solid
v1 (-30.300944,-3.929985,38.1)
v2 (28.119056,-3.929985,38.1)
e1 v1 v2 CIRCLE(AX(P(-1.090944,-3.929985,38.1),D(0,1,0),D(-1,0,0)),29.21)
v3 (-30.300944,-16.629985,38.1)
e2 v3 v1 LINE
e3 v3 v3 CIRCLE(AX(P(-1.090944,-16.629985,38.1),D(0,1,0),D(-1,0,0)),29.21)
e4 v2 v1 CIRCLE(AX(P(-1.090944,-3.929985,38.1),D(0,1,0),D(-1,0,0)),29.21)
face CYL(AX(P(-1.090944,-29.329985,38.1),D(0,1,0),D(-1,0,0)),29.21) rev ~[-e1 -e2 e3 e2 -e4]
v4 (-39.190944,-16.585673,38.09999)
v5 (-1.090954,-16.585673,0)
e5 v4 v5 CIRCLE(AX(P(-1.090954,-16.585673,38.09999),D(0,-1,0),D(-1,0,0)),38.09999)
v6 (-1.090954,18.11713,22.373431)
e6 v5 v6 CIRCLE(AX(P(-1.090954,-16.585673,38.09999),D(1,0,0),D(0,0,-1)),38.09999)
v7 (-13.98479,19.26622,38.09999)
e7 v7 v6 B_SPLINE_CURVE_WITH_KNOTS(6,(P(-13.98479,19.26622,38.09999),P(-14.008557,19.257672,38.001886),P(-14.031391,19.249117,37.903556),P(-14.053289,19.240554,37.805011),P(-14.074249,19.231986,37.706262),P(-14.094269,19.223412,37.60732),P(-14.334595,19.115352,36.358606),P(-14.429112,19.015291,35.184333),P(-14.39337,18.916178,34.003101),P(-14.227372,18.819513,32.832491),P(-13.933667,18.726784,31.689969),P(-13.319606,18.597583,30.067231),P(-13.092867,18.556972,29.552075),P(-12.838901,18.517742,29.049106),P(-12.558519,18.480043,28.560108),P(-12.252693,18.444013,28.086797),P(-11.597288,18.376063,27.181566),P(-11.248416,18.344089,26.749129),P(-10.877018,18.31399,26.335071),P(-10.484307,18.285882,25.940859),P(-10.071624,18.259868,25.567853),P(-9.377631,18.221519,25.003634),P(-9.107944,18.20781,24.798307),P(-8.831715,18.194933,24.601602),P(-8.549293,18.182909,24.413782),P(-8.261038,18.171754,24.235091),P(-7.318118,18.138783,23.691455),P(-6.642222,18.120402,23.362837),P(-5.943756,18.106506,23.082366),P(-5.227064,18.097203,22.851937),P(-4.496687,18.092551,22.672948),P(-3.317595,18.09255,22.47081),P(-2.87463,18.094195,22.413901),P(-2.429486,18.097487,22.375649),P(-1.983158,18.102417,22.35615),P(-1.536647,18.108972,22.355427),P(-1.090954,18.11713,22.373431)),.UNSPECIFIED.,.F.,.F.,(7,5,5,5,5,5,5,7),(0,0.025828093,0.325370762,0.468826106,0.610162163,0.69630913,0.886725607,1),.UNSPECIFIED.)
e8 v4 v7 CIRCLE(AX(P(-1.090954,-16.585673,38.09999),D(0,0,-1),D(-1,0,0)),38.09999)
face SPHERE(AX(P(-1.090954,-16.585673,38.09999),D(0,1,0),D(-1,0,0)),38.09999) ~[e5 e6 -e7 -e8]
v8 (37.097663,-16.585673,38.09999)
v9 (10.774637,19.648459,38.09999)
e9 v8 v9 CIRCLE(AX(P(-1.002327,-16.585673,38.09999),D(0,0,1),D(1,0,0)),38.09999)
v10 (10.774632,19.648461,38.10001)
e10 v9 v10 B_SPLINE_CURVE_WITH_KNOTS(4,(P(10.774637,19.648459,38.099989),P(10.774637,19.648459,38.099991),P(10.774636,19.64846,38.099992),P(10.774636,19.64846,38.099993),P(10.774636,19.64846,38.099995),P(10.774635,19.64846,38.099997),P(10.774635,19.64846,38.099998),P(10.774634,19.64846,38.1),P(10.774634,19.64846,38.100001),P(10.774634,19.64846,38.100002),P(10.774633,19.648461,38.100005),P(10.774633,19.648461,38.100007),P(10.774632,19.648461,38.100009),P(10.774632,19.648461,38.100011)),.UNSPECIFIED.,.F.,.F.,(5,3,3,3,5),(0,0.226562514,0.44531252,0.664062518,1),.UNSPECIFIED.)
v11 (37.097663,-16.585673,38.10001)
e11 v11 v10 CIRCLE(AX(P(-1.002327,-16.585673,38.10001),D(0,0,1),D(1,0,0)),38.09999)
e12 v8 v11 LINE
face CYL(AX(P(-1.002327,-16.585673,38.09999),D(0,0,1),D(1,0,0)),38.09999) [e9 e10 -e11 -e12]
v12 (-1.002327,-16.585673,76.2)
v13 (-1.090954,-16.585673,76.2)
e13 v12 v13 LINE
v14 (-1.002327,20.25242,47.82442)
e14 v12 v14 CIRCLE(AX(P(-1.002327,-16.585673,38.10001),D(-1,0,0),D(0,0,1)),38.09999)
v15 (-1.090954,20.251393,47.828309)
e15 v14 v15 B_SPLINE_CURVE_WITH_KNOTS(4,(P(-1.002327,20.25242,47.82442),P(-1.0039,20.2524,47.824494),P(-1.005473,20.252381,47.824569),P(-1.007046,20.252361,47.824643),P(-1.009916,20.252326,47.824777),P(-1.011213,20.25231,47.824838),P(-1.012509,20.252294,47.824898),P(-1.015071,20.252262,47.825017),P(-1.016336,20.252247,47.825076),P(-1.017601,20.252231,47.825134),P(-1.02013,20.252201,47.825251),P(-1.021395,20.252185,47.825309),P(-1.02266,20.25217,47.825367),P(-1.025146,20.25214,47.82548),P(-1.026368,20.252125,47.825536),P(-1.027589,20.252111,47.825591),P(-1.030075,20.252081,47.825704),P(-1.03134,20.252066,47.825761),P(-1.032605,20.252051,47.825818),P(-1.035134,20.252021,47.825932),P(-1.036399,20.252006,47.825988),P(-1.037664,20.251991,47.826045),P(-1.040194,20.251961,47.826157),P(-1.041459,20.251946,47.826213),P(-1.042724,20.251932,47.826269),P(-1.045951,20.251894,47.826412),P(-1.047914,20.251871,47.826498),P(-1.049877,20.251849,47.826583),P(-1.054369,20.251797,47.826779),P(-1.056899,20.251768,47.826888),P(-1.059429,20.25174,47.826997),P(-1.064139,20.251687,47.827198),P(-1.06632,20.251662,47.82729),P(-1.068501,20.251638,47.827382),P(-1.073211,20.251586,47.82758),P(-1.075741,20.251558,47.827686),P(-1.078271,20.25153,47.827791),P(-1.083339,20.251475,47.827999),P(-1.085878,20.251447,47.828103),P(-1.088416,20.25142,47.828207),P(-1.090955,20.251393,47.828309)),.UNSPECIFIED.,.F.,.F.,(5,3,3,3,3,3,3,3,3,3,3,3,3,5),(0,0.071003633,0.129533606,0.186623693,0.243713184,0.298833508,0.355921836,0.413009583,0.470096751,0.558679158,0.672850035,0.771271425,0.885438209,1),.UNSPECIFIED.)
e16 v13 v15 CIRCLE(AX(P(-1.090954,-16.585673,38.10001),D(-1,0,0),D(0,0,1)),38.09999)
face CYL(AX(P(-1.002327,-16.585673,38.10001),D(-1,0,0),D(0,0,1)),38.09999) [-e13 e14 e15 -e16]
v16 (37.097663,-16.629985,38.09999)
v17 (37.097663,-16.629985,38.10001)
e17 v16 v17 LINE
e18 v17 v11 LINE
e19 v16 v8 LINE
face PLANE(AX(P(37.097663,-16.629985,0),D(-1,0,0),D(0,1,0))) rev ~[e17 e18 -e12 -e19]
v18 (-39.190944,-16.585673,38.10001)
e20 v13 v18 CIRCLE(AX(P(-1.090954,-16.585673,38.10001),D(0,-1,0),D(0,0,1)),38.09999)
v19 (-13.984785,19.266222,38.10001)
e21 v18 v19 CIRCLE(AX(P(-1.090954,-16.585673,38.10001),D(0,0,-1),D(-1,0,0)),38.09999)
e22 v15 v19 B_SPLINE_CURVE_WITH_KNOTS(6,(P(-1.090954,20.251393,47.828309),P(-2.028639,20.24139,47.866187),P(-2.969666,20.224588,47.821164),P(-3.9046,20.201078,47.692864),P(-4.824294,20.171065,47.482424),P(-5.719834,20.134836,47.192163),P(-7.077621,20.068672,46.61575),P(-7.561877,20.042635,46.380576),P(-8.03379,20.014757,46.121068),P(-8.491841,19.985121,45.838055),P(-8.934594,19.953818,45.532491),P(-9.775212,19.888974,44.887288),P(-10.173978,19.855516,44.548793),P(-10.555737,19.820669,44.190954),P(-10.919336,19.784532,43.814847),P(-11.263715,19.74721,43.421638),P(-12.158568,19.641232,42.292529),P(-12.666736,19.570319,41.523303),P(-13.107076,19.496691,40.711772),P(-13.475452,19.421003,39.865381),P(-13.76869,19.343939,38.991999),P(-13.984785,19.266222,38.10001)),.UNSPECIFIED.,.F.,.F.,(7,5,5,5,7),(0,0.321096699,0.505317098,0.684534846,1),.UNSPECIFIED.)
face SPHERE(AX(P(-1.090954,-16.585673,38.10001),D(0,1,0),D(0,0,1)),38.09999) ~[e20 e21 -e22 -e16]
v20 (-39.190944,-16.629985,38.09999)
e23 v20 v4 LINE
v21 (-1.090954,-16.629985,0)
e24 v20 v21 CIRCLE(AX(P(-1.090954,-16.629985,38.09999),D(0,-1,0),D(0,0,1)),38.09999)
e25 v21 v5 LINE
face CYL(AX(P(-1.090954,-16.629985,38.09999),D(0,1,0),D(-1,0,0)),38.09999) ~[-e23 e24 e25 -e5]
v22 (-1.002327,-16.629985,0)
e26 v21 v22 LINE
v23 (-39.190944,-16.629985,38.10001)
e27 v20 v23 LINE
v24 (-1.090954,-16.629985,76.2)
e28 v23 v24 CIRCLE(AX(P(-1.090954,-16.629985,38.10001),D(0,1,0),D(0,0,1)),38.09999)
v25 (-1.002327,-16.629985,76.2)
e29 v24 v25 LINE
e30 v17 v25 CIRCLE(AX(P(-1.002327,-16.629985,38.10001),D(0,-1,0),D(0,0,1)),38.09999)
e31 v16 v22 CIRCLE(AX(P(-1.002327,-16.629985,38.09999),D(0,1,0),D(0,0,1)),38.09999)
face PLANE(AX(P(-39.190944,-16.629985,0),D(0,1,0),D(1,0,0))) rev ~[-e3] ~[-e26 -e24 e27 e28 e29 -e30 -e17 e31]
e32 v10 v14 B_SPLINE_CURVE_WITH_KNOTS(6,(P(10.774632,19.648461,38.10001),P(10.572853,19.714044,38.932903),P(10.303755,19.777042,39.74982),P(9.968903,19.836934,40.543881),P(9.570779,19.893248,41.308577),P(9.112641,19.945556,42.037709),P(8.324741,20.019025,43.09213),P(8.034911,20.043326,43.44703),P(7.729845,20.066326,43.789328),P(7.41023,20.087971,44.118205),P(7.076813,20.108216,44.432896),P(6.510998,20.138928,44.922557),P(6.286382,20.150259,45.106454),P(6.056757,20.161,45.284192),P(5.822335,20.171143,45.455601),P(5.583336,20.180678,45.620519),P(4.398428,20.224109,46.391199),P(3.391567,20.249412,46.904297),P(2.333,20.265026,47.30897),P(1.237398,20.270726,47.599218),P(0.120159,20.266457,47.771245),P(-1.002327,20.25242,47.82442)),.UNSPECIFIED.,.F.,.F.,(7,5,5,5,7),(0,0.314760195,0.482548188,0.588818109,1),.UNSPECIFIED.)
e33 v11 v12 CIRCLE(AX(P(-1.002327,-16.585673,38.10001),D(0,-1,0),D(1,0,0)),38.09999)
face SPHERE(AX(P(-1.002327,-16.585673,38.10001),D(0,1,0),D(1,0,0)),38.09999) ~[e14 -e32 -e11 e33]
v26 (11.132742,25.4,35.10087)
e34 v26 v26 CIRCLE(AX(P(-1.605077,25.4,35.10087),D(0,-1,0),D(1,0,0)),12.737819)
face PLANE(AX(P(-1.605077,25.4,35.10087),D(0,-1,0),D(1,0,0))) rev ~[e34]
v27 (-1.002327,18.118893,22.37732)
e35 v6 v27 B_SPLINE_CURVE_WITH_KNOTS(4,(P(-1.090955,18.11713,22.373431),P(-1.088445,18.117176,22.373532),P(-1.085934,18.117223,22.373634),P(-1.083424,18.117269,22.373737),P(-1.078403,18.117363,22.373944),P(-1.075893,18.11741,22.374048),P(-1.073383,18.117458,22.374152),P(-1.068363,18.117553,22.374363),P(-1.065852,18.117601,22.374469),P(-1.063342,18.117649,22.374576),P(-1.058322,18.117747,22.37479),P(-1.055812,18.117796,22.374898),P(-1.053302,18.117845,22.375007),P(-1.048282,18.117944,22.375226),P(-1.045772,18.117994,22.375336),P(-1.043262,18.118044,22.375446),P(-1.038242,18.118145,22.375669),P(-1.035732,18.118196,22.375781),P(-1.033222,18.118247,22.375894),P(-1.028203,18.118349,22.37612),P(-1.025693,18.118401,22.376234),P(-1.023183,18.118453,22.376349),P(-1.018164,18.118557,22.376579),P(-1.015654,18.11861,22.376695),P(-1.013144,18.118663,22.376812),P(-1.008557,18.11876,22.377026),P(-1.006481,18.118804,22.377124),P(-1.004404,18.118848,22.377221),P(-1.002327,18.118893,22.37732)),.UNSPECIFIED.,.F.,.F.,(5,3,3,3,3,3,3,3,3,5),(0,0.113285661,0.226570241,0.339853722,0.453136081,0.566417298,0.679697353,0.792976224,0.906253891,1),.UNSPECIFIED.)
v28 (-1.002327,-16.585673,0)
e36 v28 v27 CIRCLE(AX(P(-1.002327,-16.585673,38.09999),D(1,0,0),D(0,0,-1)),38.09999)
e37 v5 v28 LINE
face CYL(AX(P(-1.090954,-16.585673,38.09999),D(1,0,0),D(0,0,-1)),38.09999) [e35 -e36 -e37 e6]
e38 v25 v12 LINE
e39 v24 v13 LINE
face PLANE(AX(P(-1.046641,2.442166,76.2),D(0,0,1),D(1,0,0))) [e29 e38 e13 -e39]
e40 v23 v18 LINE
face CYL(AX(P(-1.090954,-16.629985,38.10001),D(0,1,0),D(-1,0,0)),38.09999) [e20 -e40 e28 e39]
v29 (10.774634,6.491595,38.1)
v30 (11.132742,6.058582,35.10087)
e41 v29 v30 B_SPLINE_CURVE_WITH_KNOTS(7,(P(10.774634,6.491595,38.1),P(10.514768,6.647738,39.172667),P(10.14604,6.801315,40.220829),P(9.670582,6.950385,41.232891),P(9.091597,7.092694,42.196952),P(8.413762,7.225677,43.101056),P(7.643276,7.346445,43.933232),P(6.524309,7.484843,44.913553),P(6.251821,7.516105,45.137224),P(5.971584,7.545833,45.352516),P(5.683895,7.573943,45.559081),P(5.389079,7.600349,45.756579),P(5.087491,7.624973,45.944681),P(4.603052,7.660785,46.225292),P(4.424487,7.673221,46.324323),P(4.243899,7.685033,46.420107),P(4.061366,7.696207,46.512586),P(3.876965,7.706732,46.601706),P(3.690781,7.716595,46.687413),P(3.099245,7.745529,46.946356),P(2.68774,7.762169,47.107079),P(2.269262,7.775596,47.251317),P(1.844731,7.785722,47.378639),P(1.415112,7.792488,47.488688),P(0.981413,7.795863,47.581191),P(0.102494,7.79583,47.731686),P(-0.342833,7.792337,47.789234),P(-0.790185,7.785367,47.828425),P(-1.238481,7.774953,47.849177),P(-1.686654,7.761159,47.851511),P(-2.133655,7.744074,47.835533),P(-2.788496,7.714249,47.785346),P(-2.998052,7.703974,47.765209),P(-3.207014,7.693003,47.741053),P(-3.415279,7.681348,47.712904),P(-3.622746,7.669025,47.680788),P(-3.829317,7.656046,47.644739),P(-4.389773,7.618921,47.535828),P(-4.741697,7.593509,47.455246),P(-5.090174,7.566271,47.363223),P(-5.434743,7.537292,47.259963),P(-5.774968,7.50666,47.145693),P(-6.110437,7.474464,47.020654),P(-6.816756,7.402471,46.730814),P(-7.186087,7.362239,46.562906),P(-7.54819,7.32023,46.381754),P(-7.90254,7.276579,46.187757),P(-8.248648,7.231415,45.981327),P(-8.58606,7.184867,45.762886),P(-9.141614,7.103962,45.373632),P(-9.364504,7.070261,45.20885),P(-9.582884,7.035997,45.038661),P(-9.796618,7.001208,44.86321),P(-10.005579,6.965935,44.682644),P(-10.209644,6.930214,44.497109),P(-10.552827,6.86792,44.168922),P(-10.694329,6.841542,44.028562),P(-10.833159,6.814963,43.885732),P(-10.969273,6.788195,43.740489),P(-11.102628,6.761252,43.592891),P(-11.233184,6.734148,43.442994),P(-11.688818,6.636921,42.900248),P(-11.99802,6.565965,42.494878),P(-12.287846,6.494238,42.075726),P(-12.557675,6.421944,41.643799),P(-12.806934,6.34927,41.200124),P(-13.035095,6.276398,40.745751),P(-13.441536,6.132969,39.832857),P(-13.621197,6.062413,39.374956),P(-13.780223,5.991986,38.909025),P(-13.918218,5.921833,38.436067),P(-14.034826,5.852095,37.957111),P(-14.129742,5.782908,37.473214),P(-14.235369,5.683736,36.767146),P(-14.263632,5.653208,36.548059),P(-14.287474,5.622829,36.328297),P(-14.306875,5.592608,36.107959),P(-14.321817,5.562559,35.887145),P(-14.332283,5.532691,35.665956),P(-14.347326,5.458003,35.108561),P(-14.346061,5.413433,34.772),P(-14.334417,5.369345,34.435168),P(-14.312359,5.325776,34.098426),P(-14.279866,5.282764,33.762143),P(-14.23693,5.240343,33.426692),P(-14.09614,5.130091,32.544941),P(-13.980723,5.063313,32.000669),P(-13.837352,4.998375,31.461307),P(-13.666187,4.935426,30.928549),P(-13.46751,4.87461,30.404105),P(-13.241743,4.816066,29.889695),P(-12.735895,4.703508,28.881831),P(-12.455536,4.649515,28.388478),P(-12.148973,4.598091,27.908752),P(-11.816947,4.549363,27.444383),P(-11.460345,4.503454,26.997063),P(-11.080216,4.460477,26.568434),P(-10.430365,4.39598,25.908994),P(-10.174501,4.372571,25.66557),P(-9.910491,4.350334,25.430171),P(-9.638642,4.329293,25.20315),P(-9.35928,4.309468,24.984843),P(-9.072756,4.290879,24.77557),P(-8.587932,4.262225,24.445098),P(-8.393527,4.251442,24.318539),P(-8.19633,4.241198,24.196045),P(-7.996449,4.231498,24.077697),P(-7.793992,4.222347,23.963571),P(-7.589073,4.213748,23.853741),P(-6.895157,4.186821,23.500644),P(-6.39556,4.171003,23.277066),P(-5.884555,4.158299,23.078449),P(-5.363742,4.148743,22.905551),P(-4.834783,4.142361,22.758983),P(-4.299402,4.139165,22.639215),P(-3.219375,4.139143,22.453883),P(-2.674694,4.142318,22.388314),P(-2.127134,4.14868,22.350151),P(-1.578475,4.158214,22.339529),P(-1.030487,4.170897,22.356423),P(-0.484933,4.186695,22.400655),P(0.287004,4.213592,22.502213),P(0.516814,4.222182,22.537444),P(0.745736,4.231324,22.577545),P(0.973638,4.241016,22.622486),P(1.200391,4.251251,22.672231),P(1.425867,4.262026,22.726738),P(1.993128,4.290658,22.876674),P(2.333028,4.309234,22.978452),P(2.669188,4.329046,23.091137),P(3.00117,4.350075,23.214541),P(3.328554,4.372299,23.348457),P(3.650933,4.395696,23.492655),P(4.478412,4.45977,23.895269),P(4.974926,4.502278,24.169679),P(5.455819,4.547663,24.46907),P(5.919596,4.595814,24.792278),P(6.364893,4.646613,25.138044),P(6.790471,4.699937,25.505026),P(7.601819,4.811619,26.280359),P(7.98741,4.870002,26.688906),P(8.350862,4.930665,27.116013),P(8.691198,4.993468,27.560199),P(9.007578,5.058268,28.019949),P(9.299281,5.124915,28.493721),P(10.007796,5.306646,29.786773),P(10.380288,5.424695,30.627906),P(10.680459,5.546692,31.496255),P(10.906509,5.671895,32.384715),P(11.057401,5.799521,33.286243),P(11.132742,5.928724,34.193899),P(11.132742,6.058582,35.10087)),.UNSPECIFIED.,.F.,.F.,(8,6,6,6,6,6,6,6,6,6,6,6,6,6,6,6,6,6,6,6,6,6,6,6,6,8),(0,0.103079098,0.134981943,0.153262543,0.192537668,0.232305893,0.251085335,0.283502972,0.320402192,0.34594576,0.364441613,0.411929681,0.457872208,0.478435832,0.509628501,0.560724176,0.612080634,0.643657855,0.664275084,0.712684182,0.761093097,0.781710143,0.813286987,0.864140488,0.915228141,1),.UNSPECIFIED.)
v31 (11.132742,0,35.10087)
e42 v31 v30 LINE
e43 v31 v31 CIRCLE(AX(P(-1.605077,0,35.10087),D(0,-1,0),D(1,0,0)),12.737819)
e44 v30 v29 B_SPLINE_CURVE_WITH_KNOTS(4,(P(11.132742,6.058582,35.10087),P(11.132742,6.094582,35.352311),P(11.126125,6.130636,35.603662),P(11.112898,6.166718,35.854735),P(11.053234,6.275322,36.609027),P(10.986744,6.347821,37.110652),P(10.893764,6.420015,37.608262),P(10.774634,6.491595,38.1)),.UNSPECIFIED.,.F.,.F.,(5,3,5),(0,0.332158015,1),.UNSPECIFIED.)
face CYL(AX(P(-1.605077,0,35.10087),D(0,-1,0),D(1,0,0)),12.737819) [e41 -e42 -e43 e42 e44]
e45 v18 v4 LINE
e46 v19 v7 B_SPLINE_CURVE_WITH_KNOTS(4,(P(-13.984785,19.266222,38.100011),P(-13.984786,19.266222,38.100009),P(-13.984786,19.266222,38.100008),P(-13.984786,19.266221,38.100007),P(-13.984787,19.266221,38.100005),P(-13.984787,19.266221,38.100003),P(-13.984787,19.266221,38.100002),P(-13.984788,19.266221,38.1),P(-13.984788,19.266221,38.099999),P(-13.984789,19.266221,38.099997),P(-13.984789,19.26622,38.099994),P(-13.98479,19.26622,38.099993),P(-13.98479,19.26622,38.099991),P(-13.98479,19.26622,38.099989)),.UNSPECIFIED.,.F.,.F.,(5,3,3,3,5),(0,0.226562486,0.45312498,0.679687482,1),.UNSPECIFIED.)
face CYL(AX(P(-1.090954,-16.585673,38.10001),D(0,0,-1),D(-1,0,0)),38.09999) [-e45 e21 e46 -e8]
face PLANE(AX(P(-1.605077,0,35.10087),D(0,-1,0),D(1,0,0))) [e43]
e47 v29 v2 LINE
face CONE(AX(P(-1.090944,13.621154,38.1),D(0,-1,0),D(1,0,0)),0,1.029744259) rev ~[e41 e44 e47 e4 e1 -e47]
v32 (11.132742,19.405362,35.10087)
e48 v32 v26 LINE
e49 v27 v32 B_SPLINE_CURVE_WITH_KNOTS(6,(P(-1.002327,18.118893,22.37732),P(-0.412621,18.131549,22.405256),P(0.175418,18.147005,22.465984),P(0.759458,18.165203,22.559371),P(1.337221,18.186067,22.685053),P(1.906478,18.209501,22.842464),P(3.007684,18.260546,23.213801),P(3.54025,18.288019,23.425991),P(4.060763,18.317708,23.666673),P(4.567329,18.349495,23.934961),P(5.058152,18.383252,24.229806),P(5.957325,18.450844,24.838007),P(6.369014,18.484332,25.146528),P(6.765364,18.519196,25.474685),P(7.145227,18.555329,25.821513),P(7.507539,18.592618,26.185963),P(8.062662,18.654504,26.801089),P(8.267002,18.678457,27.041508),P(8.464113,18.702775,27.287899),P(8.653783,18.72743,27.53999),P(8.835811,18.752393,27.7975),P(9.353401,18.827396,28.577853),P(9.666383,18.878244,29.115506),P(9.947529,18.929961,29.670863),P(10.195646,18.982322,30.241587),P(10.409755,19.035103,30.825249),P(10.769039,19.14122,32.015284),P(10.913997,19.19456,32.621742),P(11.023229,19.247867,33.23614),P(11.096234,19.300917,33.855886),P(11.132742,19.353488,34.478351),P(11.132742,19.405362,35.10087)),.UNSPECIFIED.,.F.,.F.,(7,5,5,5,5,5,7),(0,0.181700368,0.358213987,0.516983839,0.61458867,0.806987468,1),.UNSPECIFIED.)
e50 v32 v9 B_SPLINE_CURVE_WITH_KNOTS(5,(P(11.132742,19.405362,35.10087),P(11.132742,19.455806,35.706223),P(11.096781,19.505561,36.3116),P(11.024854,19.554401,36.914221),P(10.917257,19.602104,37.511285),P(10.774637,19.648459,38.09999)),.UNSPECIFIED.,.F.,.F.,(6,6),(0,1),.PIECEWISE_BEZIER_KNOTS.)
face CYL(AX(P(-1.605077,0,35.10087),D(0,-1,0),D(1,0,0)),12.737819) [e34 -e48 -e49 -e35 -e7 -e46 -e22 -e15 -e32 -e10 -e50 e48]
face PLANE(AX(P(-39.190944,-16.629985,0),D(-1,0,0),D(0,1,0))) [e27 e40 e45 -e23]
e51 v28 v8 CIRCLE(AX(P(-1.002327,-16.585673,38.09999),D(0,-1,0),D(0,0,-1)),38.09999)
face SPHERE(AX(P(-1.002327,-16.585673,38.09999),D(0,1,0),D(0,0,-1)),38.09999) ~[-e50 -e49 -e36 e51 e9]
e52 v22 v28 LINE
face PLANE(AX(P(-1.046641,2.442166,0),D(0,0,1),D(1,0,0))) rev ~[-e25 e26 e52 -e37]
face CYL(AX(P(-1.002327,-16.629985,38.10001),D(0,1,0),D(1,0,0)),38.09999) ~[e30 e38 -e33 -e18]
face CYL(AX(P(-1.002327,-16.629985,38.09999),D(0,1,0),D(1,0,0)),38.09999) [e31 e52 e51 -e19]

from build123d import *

# Parameters (mm, degrees)
F0_W     = 76.2886069715
F0_H     = 38.1443016231
F1_DEPTH = 76.2
F2_R     = 38.09999
F4_D     = 58.42
F4_DEPTH = 12.7
F4_TIP   = 17.5511386818
F5_R     = 38.09999
F6_R     = 12.7378189323
F7_DEPTH = 25.4


# Not quite as in the source:
# - a fillet or chamfer is up to 0.001 mm smaller than in the source, because OpenCascade refuses the exact size


with BuildPart() as f1:
    # F0 (on Top) → F1 (new body)
    with BuildSketch(Plane.XY):
        with Locations((-1.0466407984, 2.4421662092)):
            Rectangle(F0_W, F0_H)
    extrude(amount=F1_DEPTH)

    # F2 (radius 38.1 in the source; OpenCascade refuses exactly that, so slightly less here)
    f2_edges = [f1.edges().sort_by_distance(p)[0] for p in [
        (-39.190944, 2.442166, 76.2),
        (-39.190944, 2.442166, 0),
        (37.097663, 2.442166, 76.2),
        (37.097663, 2.442166, 0),
    ]]
    fillet(f2_edges, radius=F2_R)

    # F4
    with Locations(Plane.XZ.offset(16.6299846023)):
        with Locations((-1.0909442842, 38.1)):
            Hole(F4_D / 2, depth=F4_DEPTH)
            with Locations((0, 0, -(F4_DEPTH + F4_TIP / 2))):  # 118° drill point
                Cone(0, F4_D / 2, F4_TIP, mode=Mode.SUBTRACT)

    # F5 (radius 38.1 in the source; OpenCascade refuses exactly that, so slightly less here)
    f5_edges = [f1.edges().sort_by_distance(p)[0] for p in [
        (-28.031716, 21.514317, 11.159229),
        (25.938434, 21.514317, 11.159229),
    ]]
    fillet(f5_edges, radius=F5_R)

    # F6 (on Front) → F7 (join)
    with BuildSketch(Plane.XZ):
        with Locations((-1.6050767154, 35.1008698344)):
            Circle(F6_R)
    extrude(amount=-F7_DEPTH)


solid = f1.part
